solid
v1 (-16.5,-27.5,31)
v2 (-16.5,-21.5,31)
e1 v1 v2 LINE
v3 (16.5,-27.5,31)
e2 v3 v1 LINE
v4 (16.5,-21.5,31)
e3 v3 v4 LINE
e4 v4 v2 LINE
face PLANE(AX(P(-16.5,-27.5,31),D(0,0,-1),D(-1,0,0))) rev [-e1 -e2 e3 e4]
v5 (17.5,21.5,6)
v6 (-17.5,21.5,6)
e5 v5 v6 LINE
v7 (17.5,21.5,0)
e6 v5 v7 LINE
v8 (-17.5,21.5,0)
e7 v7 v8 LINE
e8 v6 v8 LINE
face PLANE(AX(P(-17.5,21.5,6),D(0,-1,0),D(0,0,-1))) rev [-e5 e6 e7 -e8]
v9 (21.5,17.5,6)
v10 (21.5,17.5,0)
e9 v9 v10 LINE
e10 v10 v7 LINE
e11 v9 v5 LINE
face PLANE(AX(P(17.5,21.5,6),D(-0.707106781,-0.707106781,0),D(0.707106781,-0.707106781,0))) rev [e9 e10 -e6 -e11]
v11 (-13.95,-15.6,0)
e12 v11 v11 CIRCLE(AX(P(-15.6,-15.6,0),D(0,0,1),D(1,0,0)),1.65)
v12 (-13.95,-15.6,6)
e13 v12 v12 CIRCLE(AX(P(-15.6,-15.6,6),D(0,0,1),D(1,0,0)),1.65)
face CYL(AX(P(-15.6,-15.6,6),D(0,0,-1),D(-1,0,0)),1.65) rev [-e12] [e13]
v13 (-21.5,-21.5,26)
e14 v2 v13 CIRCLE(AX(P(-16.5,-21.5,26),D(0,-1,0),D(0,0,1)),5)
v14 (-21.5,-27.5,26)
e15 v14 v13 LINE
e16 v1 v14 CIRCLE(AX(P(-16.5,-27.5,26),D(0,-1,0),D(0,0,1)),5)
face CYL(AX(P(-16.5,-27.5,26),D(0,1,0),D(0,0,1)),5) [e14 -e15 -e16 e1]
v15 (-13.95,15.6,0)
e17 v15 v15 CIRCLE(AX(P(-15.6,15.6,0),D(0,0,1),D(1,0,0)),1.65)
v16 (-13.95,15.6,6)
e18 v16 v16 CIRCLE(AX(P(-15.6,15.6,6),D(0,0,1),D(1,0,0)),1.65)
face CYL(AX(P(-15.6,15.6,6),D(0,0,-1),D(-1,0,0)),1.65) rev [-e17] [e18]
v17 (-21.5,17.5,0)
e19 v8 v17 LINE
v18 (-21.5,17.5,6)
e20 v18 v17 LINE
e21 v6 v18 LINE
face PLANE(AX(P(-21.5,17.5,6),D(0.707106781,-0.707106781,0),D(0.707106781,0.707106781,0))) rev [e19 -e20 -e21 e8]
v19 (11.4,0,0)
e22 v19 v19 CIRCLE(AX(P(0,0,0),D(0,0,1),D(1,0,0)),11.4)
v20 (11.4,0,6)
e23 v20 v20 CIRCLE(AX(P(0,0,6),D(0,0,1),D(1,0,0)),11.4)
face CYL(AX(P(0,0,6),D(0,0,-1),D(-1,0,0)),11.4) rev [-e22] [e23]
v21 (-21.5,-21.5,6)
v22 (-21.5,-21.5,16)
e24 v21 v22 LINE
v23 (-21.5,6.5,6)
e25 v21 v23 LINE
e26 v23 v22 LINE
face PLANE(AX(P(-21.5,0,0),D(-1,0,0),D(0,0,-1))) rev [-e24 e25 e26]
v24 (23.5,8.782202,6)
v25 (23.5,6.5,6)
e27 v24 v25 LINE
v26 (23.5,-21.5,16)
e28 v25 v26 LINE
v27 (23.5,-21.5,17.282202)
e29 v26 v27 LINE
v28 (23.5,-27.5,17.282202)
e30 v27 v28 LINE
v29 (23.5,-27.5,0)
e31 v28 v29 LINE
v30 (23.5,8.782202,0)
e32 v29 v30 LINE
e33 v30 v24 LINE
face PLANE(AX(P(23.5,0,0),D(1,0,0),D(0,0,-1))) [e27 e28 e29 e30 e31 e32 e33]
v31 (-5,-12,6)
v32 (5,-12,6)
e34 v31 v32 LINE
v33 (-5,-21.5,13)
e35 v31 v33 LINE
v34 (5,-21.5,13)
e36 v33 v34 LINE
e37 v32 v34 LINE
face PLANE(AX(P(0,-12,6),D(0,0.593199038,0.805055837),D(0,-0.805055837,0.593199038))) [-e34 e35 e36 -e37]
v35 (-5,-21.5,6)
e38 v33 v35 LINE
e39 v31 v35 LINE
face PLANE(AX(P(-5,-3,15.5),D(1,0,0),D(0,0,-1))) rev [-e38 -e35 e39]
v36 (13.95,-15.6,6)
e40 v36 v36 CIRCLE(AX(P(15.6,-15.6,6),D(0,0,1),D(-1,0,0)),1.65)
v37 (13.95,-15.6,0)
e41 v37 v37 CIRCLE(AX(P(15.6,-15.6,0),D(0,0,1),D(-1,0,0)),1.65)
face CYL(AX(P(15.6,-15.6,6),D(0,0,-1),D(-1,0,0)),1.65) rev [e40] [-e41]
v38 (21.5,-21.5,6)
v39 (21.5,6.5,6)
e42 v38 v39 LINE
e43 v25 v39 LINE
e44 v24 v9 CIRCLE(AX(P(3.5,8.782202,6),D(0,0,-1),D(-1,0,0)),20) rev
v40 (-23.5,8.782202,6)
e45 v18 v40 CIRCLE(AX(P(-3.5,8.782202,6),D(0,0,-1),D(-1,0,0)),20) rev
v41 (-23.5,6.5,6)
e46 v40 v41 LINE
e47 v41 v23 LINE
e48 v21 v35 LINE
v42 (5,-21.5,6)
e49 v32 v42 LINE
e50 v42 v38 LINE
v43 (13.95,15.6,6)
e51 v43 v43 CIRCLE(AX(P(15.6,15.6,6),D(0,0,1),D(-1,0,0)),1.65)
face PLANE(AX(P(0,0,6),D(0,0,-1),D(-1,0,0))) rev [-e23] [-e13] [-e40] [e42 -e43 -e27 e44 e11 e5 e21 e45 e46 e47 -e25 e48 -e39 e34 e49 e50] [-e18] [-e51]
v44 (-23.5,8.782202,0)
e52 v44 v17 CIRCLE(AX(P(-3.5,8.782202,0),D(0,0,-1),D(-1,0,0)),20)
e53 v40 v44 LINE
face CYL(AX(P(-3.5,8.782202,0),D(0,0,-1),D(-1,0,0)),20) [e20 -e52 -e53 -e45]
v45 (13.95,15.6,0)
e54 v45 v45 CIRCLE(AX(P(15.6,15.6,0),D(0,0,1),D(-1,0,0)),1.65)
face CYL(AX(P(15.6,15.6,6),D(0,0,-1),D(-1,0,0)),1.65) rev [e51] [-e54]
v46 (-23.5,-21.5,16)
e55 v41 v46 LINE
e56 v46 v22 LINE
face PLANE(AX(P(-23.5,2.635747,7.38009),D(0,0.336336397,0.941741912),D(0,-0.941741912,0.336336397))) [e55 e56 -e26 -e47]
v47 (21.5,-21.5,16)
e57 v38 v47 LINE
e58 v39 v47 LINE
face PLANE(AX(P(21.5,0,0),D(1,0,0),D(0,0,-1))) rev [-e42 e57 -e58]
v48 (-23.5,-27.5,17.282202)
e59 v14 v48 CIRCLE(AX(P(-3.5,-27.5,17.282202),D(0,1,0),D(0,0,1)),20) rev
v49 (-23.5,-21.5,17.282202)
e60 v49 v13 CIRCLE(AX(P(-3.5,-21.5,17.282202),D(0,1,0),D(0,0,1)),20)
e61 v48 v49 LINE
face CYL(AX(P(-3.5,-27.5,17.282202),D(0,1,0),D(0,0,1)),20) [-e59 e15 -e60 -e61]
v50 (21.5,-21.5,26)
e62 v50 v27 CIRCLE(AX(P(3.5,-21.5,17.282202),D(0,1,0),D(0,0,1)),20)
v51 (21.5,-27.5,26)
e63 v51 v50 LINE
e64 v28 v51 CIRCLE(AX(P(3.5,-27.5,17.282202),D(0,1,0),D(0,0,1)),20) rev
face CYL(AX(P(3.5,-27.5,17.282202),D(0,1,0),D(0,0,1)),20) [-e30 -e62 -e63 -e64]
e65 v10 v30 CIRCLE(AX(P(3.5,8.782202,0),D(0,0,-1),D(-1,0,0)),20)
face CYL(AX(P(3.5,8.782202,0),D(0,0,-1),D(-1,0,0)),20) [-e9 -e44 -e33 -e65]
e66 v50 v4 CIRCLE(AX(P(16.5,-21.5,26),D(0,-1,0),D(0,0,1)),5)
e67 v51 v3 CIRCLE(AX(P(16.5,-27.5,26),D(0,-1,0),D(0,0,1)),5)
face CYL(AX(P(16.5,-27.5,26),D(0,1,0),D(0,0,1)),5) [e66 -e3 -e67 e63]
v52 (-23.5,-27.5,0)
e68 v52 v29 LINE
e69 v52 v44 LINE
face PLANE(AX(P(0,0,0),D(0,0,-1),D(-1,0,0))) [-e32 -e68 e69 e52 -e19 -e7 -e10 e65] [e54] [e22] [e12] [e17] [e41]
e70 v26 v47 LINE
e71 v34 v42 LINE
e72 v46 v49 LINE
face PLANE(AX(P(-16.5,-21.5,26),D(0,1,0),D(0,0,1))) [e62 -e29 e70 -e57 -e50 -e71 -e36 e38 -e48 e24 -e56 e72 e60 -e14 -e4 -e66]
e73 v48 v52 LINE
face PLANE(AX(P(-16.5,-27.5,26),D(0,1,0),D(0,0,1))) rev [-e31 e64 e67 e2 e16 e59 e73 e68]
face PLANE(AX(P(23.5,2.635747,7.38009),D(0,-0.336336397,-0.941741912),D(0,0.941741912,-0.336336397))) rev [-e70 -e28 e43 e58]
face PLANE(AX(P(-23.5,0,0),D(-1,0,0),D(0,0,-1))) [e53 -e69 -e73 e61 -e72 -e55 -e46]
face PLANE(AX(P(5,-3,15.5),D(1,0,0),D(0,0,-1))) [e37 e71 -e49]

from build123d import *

# Parameters (mm, degrees)
CROQUIS1_R               = 1.65
CROQUIS1_R_2             = 11.4
SALIENTE_EXTRUIR1_DEPTH  = 6
SALIENTE_EXTRUIR2_DEPTH  = 6
NERVIO1_REACH            = 48.685
CROQUIS3_WALL_W          = 107.170654524
CROQUIS3_WALL_H          = 10
SALIENTE_EXTRUIR3_DEPTH  = 2
REDONDEO1_R              = 20
REDONDEO1_OF_SIMETR_A1_R = 20


with BuildPart() as part:
    # Croquis1 → Saliente-Extruir1 (new body)
    with BuildSketch(Plane.XY):
        Polygon((-21.5, -21.5), (21.5, -21.5), (21.5, 17.5), (17.5, 21.5), (-17.5, 21.5), (-21.5, 17.5), align=None)
        with Locations((-15.6, 15.6)):
            Circle(CROQUIS1_R, mode=Mode.SUBTRACT)
        with Locations((-15.6, -15.6)):
            Circle(CROQUIS1_R, mode=Mode.SUBTRACT)
        with Locations(Location((15.6, -15.6, 0), (0, 0, 180))):
            Circle(CROQUIS1_R, mode=Mode.SUBTRACT)
        with Locations(Location((15.6, 15.6, 0), (0, 0, 180))):
            Circle(CROQUIS1_R, mode=Mode.SUBTRACT)
        Circle(CROQUIS1_R_2, mode=Mode.SUBTRACT)
    extrude(amount=SALIENTE_EXTRUIR1_DEPTH)

    # Croquis2 → Saliente-Extruir2 (add)
    with BuildSketch(Plane.XZ.offset(21.5)):
        with BuildLine():
            Line((-21.5, 0), (21.5, 0))
            Line((21.5, 0), (21.5, 26))
            ThreePointArc((21.5, 26), (20.035533906, 29.535533906), (16.5, 31))
            Line((16.5, 31), (-16.5, 31))
            ThreePointArc((-16.5, 31), (-20.035533906, 29.535533906), (-21.5, 26))
            Line((-21.5, 26), (-21.5, 0))
        make_face()
    extrude(amount=SALIENTE_EXTRUIR2_DEPTH)

    # Croquis3 wall → Nervio1 (add, up to next)
    with BuildSketch(Plane(origin=(0, -16.75, 9.5), x_dir=(0, -0.805055837353, 0.59319903805), z_dir=(0, -0.59319903805, -0.805055837353)), mode=Mode.PRIVATE) as nervio1_sk1:
        Rectangle(CROQUIS3_WALL_W, CROQUIS3_WALL_H)
    nervio1_tool1 = extrude(nervio1_sk1.sketch, amount=NERVIO1_REACH, mode=Mode.PRIVATE) - part.part
    add(nervio1_tool1.solids().sort_by_distance((0, -16.75, 9.5))[0])

    # Croquis4 → Saliente-Extruir3 (add)
    with BuildSketch(Plane(origin=(21.5, 0, 0), x_dir=(0, 0, -1), z_dir=(1, 0, 0))):
        Polygon((-6, -21.5), (-6, 6.5), (-16, -21.5), align=None)
        Polygon((-26, -27.5), (0, -27.5), (0, 17.5), (-6, 17.5), (-6, -21.5), (-26, -21.5), align=None)
    saliente_extruir3 = extrude(amount=SALIENTE_EXTRUIR3_DEPTH)

    # Redondeo1
    # the kernel refuses this fillet: 20 mm, written as the material it takes off along each edge
    with BuildSketch(Plane(origin=(23.5, 17.5, -21.794494718), x_dir=(0, -1, 0), z_dir=(0, 0, 1)), Plane(origin=(23.5, 0.294494718, 26), x_dir=(0, 0, -1), z_dir=(0, -1, 0))) as redondeo1_piece_1:
        with BuildLine():
            CenterArc((8.717797887, -20), REDONDEO1_R, 90, 25.841932763)
            Line((0, -2), (-0.174355958, -1.64))
            ThreePointArc((-0.174355958, -1.64), (-0.4, -1), (-0.4, 0))
            Line((-0.4, 0), (0, 0.4))
            Line((0, 0.4), (8.717797887, 0.4))
            Line((8.717797887, 0.4), (8.717797887, 0))
        make_face()
    extrude(amount=49.588989435, mode=Mode.SUBTRACT)

    # Simetría1: Saliente-Extruir3 across plane
    add(saliente_extruir3.mirror(Plane(origin=(0, 0, 0), x_dir=(0, 0, 1), z_dir=(1, 0, 0))))

    # Redondeo1 of Simetría1
    # the kernel refuses this fillet: 20 mm, written as the material it takes off along each edge
    with BuildSketch(Plane(origin=(-23.5, 17.5, -21.794494718), x_dir=(0, -1, 0), z_dir=(0, 0, 1))) as redondeo1_of_simetr_a1_piece_1:
        with BuildLine():
            CenterArc((8.717797887, 20), REDONDEO1_OF_SIMETR_A1_R, 244.158067237, 25.841932763)
            Line((0, 2), (-0.174355958, 1.64))
            ThreePointArc((-0.174355958, 1.64), (-0.4, 1), (-0.4, 0))
            Line((-0.4, 0), (0, -0.4))
            Line((0, -0.4), (8.717797887, -0.4))
            Line((8.717797887, -0.4), (8.717797887, 0))
        make_face()
    extrude(amount=49.588989435, mode=Mode.SUBTRACT)
    with BuildSketch(Plane(origin=(-23.5, 0.294494718, 26), x_dir=(1, 0, 0), z_dir=(0, -1, 0))) as redondeo1_of_simetr_a1_piece_2:
        with BuildLine():
            CenterArc((20, -8.717797887), REDONDEO1_OF_SIMETR_A1_R, 154.158067237, 25.841932763)
            Line((0, -8.717797887), (-0.4, -8.717797887))
            Line((-0.4, -8.717797887), (-0.4, 0))
            Line((-0.4, 0), (0, 0.4))
            ThreePointArc((0, 0.4), (1, 0.4), (1.64, 0.174355958))
            Line((1.64, 0.174355958), (2, 0))
        make_face()
    extrude(amount=49.588989435, mode=Mode.SUBTRACT)


solid = part.part
